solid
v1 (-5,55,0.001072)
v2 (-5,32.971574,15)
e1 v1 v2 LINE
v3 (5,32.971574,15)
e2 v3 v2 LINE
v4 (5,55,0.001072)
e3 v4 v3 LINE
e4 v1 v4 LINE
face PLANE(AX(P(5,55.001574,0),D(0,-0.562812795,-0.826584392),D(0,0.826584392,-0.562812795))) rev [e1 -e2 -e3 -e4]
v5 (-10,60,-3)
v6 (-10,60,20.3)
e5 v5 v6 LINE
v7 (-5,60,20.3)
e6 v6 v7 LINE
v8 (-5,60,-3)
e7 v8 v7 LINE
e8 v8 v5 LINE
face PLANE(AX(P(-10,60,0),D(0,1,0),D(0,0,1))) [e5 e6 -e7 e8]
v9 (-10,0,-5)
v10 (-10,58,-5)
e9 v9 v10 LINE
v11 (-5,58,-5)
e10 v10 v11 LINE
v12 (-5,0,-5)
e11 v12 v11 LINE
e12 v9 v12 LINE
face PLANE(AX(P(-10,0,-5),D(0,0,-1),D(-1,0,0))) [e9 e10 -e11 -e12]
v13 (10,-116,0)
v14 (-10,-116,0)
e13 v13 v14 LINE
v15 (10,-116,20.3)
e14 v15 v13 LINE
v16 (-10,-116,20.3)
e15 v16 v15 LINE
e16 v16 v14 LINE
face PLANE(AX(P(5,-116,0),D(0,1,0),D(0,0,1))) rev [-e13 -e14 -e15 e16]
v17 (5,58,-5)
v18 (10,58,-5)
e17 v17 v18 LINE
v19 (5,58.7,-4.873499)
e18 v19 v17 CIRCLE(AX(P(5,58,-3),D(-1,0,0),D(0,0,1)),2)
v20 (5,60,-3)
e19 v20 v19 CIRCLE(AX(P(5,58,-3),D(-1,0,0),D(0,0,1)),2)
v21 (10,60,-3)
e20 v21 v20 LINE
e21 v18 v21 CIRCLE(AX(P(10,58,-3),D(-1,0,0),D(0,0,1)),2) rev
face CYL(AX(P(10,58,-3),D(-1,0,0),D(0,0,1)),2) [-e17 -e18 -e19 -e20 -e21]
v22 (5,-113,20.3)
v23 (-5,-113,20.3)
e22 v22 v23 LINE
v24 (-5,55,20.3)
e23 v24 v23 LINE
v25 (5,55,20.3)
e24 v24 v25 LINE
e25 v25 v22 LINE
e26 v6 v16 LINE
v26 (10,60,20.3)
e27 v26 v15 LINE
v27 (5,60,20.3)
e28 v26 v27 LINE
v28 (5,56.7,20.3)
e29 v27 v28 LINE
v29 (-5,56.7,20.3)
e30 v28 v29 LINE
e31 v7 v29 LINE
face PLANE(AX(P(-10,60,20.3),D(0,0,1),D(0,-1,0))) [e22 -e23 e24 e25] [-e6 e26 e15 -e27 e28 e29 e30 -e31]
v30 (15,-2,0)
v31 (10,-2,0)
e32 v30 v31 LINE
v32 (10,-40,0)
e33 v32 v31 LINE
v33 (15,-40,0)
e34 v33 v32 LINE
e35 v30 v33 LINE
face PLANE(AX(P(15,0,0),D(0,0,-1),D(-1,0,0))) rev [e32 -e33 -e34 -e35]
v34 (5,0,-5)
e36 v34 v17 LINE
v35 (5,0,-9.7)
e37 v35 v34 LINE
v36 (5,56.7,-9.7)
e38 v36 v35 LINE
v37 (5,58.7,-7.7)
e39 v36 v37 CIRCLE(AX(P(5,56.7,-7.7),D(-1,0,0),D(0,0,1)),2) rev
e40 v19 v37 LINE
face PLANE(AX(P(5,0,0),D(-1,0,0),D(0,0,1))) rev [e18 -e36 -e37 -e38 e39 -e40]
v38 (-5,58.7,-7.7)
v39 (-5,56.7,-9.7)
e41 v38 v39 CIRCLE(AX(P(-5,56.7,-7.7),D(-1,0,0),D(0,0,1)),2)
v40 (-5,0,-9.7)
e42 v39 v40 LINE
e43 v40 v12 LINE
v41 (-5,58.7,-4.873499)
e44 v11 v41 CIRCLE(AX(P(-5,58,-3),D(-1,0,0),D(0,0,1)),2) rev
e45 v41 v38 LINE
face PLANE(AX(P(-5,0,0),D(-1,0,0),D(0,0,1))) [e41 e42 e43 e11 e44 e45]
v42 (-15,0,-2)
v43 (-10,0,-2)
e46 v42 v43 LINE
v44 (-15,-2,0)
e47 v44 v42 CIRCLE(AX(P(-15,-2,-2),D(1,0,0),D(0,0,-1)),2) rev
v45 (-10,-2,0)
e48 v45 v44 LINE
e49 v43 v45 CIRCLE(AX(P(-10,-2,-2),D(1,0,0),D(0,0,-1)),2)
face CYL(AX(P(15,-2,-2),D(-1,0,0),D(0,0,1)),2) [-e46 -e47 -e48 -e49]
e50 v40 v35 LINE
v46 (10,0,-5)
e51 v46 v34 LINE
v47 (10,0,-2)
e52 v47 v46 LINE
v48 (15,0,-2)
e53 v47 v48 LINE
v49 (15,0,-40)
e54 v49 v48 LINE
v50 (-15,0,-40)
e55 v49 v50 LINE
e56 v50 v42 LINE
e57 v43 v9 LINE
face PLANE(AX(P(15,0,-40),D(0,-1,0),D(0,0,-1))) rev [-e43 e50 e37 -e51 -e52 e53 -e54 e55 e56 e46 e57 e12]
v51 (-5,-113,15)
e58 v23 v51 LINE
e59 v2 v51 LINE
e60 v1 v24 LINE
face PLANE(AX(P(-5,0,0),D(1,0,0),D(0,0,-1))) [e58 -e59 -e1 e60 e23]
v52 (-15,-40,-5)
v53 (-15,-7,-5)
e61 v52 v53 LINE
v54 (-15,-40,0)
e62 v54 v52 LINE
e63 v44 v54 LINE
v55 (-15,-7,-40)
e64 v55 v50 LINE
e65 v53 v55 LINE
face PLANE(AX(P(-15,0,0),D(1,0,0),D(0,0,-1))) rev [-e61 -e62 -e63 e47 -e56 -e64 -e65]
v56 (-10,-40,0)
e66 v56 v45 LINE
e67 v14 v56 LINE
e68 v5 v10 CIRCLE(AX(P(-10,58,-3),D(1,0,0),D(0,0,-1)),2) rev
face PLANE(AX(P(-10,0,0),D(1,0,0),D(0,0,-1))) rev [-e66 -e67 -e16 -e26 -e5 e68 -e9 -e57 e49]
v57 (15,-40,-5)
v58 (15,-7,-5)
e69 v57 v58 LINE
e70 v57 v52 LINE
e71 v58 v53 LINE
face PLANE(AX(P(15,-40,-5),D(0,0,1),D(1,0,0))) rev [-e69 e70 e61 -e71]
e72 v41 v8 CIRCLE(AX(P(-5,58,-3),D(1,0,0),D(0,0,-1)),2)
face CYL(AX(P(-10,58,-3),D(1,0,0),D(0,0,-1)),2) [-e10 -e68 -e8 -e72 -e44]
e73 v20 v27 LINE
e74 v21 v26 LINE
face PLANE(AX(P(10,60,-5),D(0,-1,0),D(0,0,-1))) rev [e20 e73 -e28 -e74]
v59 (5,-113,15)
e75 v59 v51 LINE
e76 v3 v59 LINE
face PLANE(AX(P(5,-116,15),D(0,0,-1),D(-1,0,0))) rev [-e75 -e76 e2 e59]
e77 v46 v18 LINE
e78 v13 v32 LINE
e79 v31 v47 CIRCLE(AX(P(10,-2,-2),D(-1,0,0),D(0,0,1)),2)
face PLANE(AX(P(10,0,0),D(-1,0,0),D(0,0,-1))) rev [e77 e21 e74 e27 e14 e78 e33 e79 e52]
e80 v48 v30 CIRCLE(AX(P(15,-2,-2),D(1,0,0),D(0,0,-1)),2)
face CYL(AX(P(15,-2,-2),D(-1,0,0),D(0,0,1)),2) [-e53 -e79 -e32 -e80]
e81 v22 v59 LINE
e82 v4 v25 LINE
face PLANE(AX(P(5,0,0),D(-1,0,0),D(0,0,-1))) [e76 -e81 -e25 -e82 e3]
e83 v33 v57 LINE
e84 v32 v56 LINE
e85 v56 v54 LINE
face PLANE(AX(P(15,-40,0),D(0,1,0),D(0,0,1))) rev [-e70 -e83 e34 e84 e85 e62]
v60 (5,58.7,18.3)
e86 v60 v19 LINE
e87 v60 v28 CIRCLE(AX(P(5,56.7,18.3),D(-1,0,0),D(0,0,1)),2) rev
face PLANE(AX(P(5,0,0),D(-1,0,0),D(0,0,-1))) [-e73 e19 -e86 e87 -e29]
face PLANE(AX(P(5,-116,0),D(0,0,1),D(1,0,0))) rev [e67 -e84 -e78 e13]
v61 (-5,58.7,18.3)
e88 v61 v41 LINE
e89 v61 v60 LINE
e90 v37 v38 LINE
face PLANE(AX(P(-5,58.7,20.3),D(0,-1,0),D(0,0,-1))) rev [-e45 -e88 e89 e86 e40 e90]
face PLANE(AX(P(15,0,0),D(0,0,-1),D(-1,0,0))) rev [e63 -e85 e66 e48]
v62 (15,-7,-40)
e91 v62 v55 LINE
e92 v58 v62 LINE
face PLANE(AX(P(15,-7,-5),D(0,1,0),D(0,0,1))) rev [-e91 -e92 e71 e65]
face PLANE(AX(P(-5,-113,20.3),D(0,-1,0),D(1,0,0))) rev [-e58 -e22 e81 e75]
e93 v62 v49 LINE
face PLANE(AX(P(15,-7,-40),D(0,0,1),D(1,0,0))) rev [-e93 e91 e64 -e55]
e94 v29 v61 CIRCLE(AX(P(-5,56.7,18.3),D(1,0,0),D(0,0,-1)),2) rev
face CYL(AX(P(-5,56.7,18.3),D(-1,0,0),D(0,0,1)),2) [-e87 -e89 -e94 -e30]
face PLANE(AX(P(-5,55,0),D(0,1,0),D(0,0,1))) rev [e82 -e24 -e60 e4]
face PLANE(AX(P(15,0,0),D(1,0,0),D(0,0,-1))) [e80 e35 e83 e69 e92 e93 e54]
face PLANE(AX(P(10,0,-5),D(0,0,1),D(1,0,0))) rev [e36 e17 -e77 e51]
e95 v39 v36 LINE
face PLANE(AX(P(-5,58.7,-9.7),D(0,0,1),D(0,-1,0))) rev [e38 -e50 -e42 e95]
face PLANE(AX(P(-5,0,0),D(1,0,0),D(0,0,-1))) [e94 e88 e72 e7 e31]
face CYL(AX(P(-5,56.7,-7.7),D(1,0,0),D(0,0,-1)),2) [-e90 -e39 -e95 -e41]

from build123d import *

# Parameters (mm, degrees)
BOSS_EXTRUDE2_DEPTH = 15
BOSS_EXTRUDE3_DEPTH = 5
BOSS_EXTRUDE4_DEPTH = 5
BOSS_EXTRUDE5_DEPTH = 10
SKETCH10_W          = 10
SKETCH10_H          = 3
BOSS_EXTRUDE6_DEPTH = 5.3
FILLET1_R           = 2
FILLET2_R           = 2


with BuildPart() as part:
    # Sketch2 → Boss-Extrude2 (new, symmetric)
    with BuildSketch(Plane(origin=(0, 0, 0), x_dir=(0, 0, -1), z_dir=(1, 0, 0))):
        Polygon((0, 0), (0, -40), (5, -40), (5, -7), (40, -7), (40, 0), align=None)
    extrude(amount=BOSS_EXTRUDE2_DEPTH, both=True)

    # Sketch3 → Boss-Extrude3 (add, symmetric)
    with BuildSketch(Plane(origin=(0, 0, 0), x_dir=(0, 0, -1), z_dir=(1, 0, 0))):
        Polygon((0, -116), (-15, -116), (-15, 32.97157442), (0, 55.00157442), align=None)
    extrude(amount=BOSS_EXTRUDE3_DEPTH, both=True)

    # Sketch4 → Boss-Extrude4 (add)
    with BuildSketch(Plane.ZY.offset(5)):
        Polygon((0, 60), (20.3, 60), (20.3, -116), (0, -116), (0, 0), (-5, 0), (-5, 60), align=None)
    boss_extrude4 = extrude(amount=BOSS_EXTRUDE4_DEPTH)

    # Mirror1: Boss-Extrude4 across plane
    add(boss_extrude4.mirror(Plane(origin=(0, 0, 0), x_dir=(0, 0, 1), z_dir=(1, 0, 0))))

    # Sketch8 → Boss-Extrude5 (add)
    with BuildSketch(Plane.ZY.offset(-5)):
        Polygon((0, 0), (0, 55), (20.3, 55), (20.3, 58.7), (-9.7, 58.7), (-9.7, 0), align=None)
    extrude(amount=BOSS_EXTRUDE5_DEPTH)

    # Sketch10 → Boss-Extrude6 (add)
    with BuildSketch(Plane.XY.offset(15)):
        with Locations((0, -114.5)):
            Rectangle(SKETCH10_W, SKETCH10_H)
    extrude(amount=BOSS_EXTRUDE6_DEPTH)

    # Fillet1
    # the kernel refuses this fillet: 2 mm, written as the material it takes off along each edge
    with BuildSketch(Plane(origin=(5, 58.7, 20.3), x_dir=(0, -1, 0), z_dir=(-1, 0, 0))) as fillet1_piece_1:
        with BuildLine():
            CenterArc((FILLET1_R, -FILLET1_R), FILLET1_R, 90, 90)
            Line((0, -FILLET1_R), (0, 0))
            Line((0, 0), (FILLET1_R, 0))
        make_face()
    extrude(amount=10, mode=Mode.SUBTRACT)
    with BuildSketch(Plane(origin=(10, 58.7, -9.7), x_dir=(0, 0, 1), z_dir=(-1, 0, 0))) as fillet1_piece_2:
        with BuildLine():
            CenterArc((FILLET1_R, -FILLET1_R), FILLET1_R, 90, 90)
            Line((0, -FILLET1_R), (0, 0))
            Line((0, 0), (FILLET1_R, 0))
        make_face()
    extrude(amount=20, mode=Mode.SUBTRACT)
    with BuildSketch(Plane(origin=(-5, 60, -5), x_dir=(0, -1, 0), z_dir=(-1, 0, 0)), Plane(origin=(5, 60, -5), x_dir=(0, 0, 1), z_dir=(1, 0, 0))) as fillet1_piece_3:
        with BuildLine():
            CenterArc((FILLET1_R, FILLET1_R), FILLET1_R, 180, 90)
            Line((0, FILLET1_R), (0, 0))
            Line((0, 0), (FILLET1_R, 0))
        make_face()
    extrude(amount=10, mode=Mode.SUBTRACT)

    # Fillet2
    fillet2_edges = [part.edges().sort_by_distance(p)[0] for p in [
        (12.5, 0, 0),
        (-12.5, 0, 0),
    ]]
    fillet(fillet2_edges, radius=FILLET2_R)


solid = part.part
